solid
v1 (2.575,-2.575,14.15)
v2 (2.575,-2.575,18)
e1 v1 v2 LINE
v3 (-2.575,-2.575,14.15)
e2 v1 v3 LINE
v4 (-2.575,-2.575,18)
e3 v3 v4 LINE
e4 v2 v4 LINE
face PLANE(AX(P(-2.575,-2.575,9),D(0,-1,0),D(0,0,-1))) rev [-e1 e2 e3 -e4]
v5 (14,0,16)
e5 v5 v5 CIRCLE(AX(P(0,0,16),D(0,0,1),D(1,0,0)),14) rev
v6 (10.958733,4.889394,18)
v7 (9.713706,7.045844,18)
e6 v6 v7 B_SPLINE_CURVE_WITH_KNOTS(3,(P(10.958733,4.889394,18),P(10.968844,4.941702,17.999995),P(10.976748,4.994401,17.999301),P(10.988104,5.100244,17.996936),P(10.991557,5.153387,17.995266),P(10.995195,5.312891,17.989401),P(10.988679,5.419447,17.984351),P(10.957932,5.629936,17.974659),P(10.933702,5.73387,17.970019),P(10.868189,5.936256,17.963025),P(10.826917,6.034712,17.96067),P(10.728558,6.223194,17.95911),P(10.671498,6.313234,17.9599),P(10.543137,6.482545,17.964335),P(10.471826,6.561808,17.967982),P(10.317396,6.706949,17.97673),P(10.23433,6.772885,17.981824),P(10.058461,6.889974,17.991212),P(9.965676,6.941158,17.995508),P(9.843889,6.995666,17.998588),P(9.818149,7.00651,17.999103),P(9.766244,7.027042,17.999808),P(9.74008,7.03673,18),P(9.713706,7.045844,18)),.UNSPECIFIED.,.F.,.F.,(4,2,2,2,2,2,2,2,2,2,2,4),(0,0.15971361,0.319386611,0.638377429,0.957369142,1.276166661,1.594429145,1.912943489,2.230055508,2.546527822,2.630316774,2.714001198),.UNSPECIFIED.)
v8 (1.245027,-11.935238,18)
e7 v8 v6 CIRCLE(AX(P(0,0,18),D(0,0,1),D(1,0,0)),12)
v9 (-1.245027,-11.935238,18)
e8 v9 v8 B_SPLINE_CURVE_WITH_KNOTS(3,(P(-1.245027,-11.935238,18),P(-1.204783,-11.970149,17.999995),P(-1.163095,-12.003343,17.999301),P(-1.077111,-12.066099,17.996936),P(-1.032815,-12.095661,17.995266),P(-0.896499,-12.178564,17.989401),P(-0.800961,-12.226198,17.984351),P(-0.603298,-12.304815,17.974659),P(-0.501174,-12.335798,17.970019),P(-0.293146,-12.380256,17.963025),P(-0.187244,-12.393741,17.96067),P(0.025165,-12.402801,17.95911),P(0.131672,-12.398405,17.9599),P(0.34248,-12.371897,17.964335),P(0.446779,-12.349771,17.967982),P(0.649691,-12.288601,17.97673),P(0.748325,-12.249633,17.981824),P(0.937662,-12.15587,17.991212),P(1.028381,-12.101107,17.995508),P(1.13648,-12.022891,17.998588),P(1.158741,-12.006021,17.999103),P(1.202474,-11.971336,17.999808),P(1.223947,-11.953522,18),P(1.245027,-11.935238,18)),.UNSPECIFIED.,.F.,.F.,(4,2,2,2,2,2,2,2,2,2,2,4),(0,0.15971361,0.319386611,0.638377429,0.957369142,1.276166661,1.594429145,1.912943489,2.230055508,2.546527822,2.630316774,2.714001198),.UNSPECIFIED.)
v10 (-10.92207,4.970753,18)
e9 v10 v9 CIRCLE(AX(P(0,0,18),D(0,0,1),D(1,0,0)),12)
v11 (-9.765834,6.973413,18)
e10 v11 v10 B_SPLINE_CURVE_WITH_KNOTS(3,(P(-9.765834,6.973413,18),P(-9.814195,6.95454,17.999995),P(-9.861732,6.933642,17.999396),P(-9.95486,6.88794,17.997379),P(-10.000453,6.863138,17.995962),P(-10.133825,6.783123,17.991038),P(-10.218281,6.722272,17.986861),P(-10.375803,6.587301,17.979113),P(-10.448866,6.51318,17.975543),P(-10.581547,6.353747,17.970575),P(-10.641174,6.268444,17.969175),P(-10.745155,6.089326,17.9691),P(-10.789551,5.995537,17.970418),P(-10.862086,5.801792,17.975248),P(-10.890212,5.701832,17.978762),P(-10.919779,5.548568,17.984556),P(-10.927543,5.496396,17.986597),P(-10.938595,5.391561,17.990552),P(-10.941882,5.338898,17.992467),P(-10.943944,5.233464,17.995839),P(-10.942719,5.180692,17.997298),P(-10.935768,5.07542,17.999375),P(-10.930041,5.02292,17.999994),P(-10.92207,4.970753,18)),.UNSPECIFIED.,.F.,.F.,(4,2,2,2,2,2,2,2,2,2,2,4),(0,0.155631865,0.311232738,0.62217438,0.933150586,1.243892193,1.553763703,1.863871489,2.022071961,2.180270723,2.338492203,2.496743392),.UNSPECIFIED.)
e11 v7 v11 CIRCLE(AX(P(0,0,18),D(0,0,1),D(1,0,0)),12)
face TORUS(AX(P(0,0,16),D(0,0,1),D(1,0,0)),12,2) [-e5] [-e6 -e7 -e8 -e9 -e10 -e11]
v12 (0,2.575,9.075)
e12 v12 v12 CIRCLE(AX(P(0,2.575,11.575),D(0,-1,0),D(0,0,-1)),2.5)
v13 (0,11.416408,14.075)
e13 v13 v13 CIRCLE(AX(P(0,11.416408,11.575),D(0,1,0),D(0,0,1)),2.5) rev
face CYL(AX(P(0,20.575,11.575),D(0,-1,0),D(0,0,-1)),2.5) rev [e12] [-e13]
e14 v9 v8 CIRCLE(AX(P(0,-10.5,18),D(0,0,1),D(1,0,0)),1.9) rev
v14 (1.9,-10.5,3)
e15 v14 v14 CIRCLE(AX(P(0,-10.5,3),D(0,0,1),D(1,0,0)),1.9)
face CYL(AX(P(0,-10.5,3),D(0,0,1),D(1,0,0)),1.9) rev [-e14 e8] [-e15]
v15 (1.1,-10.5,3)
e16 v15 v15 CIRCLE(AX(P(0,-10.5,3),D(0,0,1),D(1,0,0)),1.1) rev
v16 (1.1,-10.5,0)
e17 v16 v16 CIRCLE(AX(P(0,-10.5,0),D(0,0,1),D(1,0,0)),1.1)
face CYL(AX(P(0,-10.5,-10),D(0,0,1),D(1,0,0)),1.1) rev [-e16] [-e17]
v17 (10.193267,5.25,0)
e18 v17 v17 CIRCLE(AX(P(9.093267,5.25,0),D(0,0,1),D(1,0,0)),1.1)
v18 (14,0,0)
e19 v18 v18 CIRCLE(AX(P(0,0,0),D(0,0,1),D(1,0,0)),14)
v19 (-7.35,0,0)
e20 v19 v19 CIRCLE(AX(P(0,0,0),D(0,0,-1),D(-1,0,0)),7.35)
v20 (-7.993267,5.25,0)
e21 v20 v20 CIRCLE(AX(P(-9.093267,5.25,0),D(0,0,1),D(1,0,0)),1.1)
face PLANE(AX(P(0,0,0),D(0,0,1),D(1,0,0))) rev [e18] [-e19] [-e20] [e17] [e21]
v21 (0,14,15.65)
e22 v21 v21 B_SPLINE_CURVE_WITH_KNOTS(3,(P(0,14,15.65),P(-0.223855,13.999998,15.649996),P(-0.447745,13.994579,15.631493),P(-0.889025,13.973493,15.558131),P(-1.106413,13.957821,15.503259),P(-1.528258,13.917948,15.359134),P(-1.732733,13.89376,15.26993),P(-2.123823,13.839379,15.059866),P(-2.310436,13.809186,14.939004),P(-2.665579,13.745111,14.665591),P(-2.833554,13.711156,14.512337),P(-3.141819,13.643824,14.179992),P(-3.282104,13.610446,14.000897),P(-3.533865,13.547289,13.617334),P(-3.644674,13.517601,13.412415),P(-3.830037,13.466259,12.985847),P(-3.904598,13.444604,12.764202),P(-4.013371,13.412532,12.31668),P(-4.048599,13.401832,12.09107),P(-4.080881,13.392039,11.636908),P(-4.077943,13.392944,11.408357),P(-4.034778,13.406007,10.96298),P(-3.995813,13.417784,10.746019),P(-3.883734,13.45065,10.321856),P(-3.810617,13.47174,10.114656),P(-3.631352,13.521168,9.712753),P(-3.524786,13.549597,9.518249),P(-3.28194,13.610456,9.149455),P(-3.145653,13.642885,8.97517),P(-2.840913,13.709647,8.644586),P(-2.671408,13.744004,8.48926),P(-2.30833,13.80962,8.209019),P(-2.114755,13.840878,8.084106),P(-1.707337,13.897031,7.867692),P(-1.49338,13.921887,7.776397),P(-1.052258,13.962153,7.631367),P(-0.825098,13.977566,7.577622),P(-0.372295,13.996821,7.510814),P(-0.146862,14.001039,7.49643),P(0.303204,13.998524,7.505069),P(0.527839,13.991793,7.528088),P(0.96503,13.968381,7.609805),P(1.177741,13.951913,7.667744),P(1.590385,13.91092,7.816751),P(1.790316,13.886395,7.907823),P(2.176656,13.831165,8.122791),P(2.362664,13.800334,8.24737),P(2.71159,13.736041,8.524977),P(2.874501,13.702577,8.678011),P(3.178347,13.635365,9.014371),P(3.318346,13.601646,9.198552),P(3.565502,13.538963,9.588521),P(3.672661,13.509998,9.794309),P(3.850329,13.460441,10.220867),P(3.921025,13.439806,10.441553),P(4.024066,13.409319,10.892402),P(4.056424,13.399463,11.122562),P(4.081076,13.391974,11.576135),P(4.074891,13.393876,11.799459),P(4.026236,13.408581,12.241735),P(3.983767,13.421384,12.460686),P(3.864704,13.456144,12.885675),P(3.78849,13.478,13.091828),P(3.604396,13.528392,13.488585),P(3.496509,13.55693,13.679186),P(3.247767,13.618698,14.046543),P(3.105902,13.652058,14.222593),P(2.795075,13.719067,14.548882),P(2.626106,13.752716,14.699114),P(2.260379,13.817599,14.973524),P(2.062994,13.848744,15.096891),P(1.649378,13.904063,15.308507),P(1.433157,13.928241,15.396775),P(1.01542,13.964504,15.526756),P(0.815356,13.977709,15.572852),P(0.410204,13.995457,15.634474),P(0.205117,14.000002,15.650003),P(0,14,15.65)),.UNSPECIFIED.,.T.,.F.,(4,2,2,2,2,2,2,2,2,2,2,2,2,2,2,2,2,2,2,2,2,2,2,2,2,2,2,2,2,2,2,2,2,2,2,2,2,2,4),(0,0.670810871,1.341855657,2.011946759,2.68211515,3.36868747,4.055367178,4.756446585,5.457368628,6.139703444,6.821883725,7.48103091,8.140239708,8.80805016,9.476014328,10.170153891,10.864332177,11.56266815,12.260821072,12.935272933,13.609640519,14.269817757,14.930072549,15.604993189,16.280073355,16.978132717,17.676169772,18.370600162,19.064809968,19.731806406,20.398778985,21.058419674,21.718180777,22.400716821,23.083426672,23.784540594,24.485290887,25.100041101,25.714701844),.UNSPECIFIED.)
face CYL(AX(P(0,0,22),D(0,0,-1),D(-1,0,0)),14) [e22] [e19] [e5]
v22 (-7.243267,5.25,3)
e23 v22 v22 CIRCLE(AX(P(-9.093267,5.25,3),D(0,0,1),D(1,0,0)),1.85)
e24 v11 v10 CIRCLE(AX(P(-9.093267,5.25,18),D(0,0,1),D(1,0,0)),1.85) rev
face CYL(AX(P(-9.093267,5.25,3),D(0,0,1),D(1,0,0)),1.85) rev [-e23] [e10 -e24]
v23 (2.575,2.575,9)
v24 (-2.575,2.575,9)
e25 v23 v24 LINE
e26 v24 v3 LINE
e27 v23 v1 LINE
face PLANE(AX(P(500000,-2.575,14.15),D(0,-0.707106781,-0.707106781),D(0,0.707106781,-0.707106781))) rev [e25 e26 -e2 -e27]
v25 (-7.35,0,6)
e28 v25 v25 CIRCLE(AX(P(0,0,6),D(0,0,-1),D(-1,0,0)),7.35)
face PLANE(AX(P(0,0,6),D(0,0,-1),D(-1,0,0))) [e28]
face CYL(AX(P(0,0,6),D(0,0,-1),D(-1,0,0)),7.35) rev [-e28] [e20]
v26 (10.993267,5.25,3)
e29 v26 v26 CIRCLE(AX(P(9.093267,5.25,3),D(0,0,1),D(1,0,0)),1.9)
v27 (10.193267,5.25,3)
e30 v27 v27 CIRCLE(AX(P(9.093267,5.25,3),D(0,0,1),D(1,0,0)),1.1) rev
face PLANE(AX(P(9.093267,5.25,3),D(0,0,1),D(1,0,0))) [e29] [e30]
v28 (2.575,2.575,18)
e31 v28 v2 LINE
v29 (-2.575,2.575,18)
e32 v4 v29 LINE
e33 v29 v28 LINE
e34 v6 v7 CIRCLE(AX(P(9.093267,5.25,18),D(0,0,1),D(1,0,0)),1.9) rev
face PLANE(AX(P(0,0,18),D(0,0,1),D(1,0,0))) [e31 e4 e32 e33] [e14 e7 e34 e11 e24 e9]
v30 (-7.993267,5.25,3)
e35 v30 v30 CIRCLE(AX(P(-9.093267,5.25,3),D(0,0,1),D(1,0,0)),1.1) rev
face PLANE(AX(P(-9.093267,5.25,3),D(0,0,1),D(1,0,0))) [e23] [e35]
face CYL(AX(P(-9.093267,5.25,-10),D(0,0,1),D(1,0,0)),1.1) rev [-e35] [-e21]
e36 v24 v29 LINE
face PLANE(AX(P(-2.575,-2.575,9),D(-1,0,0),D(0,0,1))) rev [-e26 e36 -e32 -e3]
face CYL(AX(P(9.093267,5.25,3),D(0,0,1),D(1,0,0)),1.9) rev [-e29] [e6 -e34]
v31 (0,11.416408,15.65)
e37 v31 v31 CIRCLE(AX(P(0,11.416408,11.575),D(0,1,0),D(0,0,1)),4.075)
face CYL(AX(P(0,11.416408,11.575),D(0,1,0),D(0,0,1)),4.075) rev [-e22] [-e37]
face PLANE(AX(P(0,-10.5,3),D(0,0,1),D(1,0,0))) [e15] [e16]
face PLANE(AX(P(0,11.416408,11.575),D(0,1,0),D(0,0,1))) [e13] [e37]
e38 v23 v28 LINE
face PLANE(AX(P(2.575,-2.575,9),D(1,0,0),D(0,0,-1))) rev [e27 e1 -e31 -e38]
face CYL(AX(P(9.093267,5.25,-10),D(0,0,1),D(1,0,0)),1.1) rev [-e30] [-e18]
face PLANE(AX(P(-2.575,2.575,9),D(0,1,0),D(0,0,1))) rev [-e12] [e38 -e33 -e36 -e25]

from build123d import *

# Parameters (mm, degrees)
SKETCH_1_R           = 14
EXTRUDE_1_DEPTH      = 22
SKETCH_3_R           = 7.35
CUT_EXTRUDE_1_DEPTH  = 6
SKETCH_2_R           = 1.1
CUT_EXTRUDE_2_DEPTH  = 32
SKETCH_4_R           = 1.9
SKETCH_4_R_2         = 1.85
CUT_EXTRUDE_3_DEPTH  = 19
SKETCH_5_W           = 5.15
SKETCH_5_H           = 5.15
CUT_EXTRUDE_4_DEPTH  = 13
EXTRUDE_2_REACH      = 32.899
SKETCH_12_R          = 19.208398283
CUT_EXTRUDE_9_DEPTH  = 4
FILLET_1_R           = 2
SKETCH_14_R          = 2.5
CUT_EXTRUDE_10_DEPTH = 18
SKETCH_15_R          = 4.075
CUT_EXTRUDE_11_DEPTH = 2


with BuildPart() as part:
    # 草图1 → 凸台-拉伸1 (new body)
    with BuildSketch(Plane.XY):
        Circle(SKETCH_1_R)
    extrude(amount=EXTRUDE_1_DEPTH)

    # 草图3 → 切除-拉伸1 (cut)
    with BuildSketch(Plane(origin=(0, 0, 0), x_dir=(-1, 0, 0), z_dir=(0, 0, -1))):
        Circle(SKETCH_3_R)
    extrude(amount=-CUT_EXTRUDE_1_DEPTH, mode=Mode.SUBTRACT)

    # 草图2 → 切除-拉伸2 (cut)
    with BuildSketch(Plane.XY.offset(22)):
        with Locations((-9.09326674, 5.25)):
            Circle(SKETCH_2_R)
        with Locations((9.09326674, 5.25)):
            Circle(SKETCH_2_R)
        with Locations((0, -10.5)):
            Circle(SKETCH_2_R)
    extrude(amount=-CUT_EXTRUDE_2_DEPTH, mode=Mode.SUBTRACT)

    # 草图4 → 切除-拉伸3 (cut)
    with BuildSketch(Plane.XY.offset(22)):
        with Locations((9.09326674, 5.25)):
            Circle(SKETCH_4_R)
        with Locations((0, -10.5)):
            Circle(SKETCH_4_R)
        with Locations((-9.09326674, 5.25)):
            Circle(SKETCH_4_R_2)
    extrude(amount=-CUT_EXTRUDE_3_DEPTH, mode=Mode.SUBTRACT)

    # 草图5 → 切除-拉伸4 (cut)
    with BuildSketch(Plane.XY.offset(22)):
        Rectangle(SKETCH_5_W, SKETCH_5_H)
    extrude(amount=-CUT_EXTRUDE_4_DEPTH, mode=Mode.SUBTRACT)

    # 草图6 → 凸台-拉伸2 (add, up to next)
    with BuildSketch(Plane(origin=(-2.575, 0, 0), x_dir=(0, 0, -1), z_dir=(1, 0, 0)), mode=Mode.PRIVATE) as extrude_2_sk1:
        Polygon((-9, -2.575), (-14.15, -2.575), (-9, 2.575), align=None)
    extrude_2_tool1 = extrude(extrude_2_sk1.sketch, amount=EXTRUDE_2_REACH, mode=Mode.PRIVATE) - part.part
    add(extrude_2_tool1.solids().sort_by_distance((-2.575, -0.858333, 10.716667))[0])

    # 草图12 → 切除-拉伸9 (cut)
    with BuildSketch(Plane.XY.offset(22)):
        Circle(SKETCH_12_R)
    extrude(amount=-CUT_EXTRUDE_9_DEPTH, mode=Mode.SUBTRACT)

    # 圆角1
    # the kernel refuses this fillet: 2 mm, written as the material it takes off along each edge
    with BuildSketch(Plane(origin=(0, 0, 18), x_dir=(1, 0, 0), z_dir=(0, 1, 0))) as fillet_1_piece_1:
        with BuildLine():
            CenterArc((14 - FILLET_1_R, FILLET_1_R), FILLET_1_R, 270, 90)
            Line((14, FILLET_1_R), (14, 0))
            Line((14, 0), (14 - FILLET_1_R, 0))
        make_face()
    revolve(axis=Axis((0, 0, 18), (0, 0, -1)), mode=Mode.SUBTRACT)

    # 草图14 → 切除-拉伸10 (cut)
    with BuildSketch(Plane(origin=(0, 2.575, 0), x_dir=(-1, 0, 0), z_dir=(0, -1, 0))):
        with Locations(Location((0, -11.575, 0), (0, 0, 90))):
            Circle(SKETCH_14_R)
    extrude(amount=-CUT_EXTRUDE_10_DEPTH, mode=Mode.SUBTRACT)

    # 草图15 → 切除-拉伸11 (cut, symmetric)
    with BuildSketch(Plane(origin=(0, 13.416407865, 0), x_dir=(1, 0, 0), z_dir=(0, 1, 0))):
        with Locations(Location((0, -11.575, 0), (0, 0, 270))):
            Circle(SKETCH_15_R)
    extrude(amount=CUT_EXTRUDE_11_DEPTH, both=True, mode=Mode.SUBTRACT)


solid = part.part
